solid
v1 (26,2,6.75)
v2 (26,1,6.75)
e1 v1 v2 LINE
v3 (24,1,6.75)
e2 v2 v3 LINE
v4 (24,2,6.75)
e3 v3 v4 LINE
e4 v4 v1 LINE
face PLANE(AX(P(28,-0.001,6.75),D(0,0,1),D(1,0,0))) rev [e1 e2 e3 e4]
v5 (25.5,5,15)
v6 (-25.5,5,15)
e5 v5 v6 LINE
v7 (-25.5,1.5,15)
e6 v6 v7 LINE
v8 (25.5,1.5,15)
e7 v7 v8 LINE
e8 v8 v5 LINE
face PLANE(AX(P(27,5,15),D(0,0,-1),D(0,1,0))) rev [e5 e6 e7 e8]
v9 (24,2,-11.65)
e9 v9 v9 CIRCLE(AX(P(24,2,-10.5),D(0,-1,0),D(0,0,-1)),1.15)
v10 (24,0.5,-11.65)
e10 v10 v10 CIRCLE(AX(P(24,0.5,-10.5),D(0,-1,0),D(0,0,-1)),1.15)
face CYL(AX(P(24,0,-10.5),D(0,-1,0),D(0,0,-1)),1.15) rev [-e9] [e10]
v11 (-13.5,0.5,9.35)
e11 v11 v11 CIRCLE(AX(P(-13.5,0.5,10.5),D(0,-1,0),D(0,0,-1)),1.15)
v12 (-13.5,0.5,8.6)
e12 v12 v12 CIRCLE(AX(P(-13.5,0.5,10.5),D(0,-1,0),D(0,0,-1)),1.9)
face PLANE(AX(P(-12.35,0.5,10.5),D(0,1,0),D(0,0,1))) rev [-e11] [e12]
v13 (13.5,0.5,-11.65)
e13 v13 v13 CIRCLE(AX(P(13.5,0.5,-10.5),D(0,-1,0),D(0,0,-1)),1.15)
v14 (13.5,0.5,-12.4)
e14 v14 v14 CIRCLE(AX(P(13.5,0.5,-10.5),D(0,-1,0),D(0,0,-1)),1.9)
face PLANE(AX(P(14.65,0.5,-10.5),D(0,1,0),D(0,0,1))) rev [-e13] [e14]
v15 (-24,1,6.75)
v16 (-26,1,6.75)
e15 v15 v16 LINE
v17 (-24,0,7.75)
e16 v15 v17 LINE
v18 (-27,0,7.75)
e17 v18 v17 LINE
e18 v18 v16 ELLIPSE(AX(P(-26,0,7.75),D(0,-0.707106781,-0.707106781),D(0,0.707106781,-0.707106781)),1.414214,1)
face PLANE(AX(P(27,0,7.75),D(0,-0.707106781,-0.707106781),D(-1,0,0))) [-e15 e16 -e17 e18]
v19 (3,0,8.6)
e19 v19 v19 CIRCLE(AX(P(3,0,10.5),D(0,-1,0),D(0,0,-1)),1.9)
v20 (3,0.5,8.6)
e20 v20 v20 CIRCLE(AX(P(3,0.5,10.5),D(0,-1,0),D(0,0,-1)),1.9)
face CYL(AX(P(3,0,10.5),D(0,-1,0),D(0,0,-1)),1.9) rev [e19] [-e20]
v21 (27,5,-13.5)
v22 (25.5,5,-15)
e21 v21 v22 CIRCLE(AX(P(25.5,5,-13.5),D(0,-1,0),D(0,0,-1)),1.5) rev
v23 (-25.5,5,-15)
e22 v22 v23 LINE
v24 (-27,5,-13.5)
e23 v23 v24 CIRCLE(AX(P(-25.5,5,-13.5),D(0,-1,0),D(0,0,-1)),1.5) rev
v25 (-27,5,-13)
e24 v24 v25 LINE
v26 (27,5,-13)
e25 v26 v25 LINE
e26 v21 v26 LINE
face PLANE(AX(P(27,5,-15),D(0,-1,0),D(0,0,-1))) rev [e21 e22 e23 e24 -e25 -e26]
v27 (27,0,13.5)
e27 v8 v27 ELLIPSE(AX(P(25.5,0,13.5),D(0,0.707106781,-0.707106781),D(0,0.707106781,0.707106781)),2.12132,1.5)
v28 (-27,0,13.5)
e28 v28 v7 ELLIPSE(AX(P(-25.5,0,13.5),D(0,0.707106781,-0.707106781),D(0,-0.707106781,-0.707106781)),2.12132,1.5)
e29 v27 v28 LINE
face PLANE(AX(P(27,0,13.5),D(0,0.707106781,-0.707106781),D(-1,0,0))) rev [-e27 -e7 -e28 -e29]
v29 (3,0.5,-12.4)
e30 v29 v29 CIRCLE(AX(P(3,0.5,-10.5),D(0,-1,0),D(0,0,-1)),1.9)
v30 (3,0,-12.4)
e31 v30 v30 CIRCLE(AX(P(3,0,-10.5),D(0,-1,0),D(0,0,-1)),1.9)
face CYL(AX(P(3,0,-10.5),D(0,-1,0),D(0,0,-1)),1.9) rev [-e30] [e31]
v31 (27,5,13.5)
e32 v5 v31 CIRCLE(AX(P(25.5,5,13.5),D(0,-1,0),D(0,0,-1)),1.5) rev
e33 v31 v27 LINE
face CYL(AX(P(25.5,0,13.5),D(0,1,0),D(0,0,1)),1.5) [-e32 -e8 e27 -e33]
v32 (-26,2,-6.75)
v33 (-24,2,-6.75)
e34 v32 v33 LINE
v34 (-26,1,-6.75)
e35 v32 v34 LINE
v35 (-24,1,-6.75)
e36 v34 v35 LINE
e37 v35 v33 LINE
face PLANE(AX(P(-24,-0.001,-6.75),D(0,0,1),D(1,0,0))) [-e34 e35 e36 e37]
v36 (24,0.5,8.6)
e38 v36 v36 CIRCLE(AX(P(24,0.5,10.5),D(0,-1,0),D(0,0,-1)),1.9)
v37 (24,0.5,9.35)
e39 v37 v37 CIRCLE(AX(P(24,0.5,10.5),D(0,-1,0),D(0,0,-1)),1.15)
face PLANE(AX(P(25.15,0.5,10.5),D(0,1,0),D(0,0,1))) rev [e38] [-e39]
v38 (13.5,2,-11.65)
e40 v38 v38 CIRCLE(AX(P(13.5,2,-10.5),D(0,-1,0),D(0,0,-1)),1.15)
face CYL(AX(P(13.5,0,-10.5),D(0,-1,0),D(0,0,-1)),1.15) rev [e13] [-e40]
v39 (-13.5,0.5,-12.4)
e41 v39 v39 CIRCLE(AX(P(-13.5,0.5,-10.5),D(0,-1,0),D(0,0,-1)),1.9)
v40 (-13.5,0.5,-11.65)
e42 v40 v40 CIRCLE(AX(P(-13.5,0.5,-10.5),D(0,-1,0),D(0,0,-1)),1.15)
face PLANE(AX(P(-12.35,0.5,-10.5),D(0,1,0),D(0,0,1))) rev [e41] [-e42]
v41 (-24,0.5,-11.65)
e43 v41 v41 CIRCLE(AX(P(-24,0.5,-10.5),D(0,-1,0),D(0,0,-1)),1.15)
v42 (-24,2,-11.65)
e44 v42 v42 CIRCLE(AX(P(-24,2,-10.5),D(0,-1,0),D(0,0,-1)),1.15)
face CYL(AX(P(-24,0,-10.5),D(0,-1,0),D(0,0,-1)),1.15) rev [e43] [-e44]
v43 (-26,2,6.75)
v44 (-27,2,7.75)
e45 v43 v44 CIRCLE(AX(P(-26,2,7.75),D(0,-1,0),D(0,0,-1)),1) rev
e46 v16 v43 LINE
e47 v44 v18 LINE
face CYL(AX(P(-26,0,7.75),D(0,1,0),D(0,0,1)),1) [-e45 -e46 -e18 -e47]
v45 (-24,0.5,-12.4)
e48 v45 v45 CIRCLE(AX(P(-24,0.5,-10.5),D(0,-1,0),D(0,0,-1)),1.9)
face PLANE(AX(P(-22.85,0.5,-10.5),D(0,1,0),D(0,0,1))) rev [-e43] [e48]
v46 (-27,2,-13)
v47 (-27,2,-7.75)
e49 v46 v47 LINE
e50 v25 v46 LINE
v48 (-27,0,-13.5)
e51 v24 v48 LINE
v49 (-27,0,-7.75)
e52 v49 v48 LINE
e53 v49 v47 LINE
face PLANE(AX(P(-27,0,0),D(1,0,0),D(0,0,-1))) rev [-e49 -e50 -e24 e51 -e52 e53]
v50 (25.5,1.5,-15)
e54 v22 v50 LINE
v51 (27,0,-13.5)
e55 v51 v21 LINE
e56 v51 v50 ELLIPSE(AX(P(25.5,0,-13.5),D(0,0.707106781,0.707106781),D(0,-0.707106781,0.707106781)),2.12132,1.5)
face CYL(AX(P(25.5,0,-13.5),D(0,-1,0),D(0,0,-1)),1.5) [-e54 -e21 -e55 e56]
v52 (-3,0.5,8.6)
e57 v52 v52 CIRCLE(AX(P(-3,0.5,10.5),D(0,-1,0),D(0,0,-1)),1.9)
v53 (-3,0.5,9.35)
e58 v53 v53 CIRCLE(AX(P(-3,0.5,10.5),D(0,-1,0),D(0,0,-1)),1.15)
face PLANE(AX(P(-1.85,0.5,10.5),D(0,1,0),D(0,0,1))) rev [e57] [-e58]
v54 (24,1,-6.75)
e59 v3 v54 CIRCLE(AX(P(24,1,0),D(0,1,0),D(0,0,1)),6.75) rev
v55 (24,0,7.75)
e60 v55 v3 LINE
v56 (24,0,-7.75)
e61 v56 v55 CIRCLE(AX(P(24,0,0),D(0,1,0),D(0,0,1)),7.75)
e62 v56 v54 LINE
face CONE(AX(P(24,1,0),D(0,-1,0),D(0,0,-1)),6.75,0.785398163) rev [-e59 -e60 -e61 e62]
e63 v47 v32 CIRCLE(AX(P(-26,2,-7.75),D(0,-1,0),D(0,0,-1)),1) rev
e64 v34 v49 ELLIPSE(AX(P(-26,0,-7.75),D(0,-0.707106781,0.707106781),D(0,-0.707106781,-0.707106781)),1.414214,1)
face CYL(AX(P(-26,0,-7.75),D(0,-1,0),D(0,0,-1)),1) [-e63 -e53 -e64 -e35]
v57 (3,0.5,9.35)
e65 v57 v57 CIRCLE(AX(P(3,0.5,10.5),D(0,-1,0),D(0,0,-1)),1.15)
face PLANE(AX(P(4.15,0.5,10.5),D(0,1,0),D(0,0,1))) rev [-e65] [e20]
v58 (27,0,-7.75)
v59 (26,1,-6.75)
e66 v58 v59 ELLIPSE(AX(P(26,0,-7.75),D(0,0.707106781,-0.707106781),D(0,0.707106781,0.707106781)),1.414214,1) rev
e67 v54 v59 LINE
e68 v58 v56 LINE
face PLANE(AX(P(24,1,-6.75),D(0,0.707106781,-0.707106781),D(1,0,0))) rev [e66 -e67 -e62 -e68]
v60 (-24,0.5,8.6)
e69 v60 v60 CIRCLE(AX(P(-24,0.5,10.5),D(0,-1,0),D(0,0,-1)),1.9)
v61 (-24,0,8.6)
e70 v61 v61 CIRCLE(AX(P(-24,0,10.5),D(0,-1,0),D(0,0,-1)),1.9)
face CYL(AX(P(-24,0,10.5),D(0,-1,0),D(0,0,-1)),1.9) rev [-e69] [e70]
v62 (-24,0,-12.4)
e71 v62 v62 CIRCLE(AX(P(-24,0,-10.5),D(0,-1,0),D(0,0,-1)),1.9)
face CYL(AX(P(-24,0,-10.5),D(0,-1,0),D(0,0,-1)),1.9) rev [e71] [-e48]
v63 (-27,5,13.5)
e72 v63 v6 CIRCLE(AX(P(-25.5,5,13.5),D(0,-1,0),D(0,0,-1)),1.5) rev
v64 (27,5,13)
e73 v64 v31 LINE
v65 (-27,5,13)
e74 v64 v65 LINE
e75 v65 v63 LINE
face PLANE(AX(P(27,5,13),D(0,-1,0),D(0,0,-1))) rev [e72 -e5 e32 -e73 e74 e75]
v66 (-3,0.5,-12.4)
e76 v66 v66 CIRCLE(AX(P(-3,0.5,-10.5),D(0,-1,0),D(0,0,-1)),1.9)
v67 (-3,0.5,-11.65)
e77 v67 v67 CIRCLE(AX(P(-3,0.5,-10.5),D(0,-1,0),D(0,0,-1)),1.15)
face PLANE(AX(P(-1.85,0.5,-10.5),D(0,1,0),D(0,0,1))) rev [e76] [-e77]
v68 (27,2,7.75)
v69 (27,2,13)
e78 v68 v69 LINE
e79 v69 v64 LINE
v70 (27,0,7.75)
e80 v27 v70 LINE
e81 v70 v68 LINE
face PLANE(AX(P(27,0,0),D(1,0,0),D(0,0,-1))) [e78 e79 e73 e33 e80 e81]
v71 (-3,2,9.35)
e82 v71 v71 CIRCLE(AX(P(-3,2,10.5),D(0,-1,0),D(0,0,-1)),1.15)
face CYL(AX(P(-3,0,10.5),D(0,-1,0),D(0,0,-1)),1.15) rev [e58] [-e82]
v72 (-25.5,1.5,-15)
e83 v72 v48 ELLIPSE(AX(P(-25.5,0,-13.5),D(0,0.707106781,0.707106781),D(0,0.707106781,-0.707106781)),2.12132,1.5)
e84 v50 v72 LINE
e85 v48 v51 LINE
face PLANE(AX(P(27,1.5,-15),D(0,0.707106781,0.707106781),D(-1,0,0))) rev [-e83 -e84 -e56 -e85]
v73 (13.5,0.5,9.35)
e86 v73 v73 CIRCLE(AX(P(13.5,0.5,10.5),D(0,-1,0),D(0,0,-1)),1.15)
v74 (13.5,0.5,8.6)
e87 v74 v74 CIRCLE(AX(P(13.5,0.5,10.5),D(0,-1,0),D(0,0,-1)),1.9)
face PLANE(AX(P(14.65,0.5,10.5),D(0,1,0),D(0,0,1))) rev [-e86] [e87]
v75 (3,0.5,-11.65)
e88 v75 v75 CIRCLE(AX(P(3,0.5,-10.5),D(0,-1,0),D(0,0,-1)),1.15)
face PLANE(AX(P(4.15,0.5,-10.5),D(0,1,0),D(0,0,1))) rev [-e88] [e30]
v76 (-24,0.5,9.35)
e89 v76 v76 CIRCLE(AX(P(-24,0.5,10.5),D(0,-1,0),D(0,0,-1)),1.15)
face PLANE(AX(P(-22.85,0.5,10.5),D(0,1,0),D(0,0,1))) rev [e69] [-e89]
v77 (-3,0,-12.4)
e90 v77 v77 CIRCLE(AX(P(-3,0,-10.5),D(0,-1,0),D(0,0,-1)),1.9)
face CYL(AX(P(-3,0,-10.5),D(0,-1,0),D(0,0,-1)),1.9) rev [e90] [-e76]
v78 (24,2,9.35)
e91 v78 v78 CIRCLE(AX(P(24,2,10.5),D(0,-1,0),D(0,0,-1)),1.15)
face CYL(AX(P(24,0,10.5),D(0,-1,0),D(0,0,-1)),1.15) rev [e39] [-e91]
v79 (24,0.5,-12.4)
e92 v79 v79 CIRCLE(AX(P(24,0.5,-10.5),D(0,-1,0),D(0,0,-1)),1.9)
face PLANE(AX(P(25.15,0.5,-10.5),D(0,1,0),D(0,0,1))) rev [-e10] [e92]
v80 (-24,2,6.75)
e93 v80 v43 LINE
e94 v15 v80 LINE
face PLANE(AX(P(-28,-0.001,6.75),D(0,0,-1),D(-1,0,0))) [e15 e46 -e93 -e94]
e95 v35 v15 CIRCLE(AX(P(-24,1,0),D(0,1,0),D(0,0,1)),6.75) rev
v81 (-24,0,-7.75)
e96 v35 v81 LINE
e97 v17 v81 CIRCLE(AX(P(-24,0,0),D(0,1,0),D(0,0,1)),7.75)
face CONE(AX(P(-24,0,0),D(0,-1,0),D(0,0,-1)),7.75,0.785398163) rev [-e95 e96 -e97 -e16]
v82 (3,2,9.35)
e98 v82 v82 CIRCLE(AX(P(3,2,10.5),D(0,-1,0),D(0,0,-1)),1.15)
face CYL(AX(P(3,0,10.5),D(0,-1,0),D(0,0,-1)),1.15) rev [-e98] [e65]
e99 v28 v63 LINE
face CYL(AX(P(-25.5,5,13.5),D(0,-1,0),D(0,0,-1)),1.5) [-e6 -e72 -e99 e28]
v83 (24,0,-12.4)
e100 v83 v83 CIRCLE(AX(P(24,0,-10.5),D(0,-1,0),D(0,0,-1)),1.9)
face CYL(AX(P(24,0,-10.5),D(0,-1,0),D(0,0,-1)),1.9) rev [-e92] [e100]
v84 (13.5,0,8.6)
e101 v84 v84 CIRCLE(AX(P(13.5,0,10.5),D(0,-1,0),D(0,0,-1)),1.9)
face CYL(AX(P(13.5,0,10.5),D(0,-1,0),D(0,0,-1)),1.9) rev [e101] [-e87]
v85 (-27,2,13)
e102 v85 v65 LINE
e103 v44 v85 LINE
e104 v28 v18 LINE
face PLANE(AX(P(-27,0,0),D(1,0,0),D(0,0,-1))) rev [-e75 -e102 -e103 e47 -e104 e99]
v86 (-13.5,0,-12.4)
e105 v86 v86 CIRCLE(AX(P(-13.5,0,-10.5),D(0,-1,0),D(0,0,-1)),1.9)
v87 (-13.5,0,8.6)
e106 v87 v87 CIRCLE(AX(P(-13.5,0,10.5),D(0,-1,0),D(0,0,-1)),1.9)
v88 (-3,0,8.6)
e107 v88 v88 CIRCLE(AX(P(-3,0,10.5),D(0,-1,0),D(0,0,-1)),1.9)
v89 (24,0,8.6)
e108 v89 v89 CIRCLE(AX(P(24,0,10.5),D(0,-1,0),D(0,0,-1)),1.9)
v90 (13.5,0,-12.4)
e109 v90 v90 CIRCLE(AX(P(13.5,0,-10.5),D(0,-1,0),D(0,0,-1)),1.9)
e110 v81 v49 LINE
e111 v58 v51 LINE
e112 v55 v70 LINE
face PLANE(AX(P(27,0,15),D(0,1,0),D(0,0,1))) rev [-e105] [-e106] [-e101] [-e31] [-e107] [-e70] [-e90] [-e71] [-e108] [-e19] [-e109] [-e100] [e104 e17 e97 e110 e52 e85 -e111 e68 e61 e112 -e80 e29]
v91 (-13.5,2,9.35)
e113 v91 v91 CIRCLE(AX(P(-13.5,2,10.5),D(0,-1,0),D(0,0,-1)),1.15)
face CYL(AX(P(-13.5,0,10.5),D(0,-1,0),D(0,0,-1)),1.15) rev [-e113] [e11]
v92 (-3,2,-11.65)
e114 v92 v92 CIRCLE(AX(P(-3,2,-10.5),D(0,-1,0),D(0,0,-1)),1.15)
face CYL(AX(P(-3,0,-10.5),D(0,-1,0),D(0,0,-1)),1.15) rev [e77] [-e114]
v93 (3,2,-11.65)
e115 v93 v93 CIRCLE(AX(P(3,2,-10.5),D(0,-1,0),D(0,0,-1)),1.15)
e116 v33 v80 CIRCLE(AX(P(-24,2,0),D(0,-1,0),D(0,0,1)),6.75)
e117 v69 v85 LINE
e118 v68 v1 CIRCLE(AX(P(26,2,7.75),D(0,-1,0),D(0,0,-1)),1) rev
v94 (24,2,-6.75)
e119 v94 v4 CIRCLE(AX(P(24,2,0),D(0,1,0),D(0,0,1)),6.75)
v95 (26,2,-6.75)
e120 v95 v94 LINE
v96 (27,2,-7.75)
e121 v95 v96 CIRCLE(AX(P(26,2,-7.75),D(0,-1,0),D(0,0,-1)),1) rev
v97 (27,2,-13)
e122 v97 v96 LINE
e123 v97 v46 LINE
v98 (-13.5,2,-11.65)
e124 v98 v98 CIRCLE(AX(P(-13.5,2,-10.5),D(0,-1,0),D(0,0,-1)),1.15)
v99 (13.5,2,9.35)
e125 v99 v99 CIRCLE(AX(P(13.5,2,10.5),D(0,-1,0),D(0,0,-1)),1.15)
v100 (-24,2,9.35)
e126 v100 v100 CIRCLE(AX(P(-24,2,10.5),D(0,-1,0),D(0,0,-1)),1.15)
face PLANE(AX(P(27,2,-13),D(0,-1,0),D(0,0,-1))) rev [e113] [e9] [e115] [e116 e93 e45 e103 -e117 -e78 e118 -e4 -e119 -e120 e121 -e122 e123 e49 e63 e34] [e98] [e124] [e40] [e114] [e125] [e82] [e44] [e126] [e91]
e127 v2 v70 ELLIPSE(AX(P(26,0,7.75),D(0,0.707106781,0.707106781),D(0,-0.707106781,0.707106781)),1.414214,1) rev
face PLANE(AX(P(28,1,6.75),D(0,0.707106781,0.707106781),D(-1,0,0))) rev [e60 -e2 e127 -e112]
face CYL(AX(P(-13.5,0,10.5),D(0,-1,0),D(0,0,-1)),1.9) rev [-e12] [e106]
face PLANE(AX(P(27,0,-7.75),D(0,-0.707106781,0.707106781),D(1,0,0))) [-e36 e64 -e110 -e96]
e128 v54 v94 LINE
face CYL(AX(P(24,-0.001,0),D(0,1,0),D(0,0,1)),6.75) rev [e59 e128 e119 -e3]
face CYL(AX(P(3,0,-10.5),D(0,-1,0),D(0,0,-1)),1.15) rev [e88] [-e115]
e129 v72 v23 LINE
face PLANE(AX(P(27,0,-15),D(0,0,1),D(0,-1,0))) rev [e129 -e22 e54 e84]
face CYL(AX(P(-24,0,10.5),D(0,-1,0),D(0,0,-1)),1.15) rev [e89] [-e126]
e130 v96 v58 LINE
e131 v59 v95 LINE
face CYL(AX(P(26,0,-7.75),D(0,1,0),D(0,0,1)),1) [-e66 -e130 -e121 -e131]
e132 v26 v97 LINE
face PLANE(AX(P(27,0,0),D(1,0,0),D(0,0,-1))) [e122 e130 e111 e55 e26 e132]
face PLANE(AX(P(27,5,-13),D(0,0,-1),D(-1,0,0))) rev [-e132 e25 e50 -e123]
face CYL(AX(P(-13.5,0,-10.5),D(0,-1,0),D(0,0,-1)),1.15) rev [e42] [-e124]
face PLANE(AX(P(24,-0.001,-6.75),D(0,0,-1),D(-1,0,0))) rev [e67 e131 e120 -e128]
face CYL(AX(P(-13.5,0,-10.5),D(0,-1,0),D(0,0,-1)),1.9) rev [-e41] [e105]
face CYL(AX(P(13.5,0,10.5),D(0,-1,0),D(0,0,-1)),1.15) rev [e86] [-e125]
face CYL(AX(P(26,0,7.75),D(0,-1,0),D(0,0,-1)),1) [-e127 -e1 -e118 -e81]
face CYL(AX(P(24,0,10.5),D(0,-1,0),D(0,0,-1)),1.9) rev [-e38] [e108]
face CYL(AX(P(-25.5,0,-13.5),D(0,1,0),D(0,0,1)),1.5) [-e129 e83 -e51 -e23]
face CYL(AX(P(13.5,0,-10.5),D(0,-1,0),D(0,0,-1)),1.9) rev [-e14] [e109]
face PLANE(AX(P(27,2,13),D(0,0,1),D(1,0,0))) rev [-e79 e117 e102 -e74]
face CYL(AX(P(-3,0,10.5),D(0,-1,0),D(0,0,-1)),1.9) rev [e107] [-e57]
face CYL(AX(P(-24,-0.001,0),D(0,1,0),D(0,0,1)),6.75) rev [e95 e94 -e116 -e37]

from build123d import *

# Parameters (mm, degrees)
EXTRUDE_1_DEPTH              = 27
CUT_EXTRUDE_1_REACH          = 33.032
HOLE_WIZARD_M2_1_D           = 2.3
HOLE_WIZARD_M2_1_CBORE_D     = 3.8
HOLE_WIZARD_M2_1_CBORE_DEPTH = 0.5
PATTERN_LINEAR_1_COUNT       = 3
PATTERN_LINEAR_1_PITCH       = 10.5
MIRROR_1_COPY_1_D            = 2.3
MIRROR_1_COPY_1_CBORE_D      = 3.8
MIRROR_1_COPY_1_CBORE_DEPTH  = 0.5
MIRROR_1_COPY_2_D            = 2.3
MIRROR_1_COPY_2_CBORE_D      = 3.8
MIRROR_1_COPY_2_CBORE_DEPTH  = 0.5
CHAMFER_1_SIZE               = 1
MIRROR_3_COPY_1_D            = 2.3
MIRROR_3_COPY_1_CBORE_D      = 3.8
MIRROR_3_COPY_1_CBORE_DEPTH  = 0.5
MIRROR_3_COPY_2_D            = 2.3
MIRROR_3_COPY_2_CBORE_D      = 3.8
MIRROR_3_COPY_2_CBORE_DEPTH  = 0.5
MIRROR_3_COPY_3_D            = 2.3
MIRROR_3_COPY_3_CBORE_D      = 3.8
MIRROR_3_COPY_3_CBORE_DEPTH  = 0.5
MIRROR_3_COPY_4_D            = 2.3
MIRROR_3_COPY_4_CBORE_D      = 3.8
MIRROR_3_COPY_4_CBORE_DEPTH  = 0.5
MIRROR_3_COPY_5_D            = 2.3
MIRROR_3_COPY_5_CBORE_D      = 3.8
MIRROR_3_COPY_5_CBORE_DEPTH  = 0.5
CHAMFER_1_OF_MIRROR_3_SIZE   = 1
FILLET_1_R                   = 1.5
FILLET_2_R                   = 1
CHAMFER_2_SIZE               = 1.5


with BuildPart() as part:
    # ｽｹｯﾁ1 → ﾎﾞｽ - 押し出し1 (new, symmetric)
    with BuildSketch(Plane(origin=(0, 0, 0), x_dir=(0, 0, -1), z_dir=(1, 0, 0))):
        Polygon((-15, 0), (15, 0), (15, 5), (13, 5), (13, 2), (-13, 2), (-13, 5), (-15, 5), align=None)
    extrude(amount=EXTRUDE_1_DEPTH, both=True)

    # ｽｹｯﾁ2 → ｶｯﾄ - 押し出し1 (cut, up to next)
    with BuildSketch(Plane(origin=(0, 2, 0), x_dir=(1, 0, 0), z_dir=(0, 1, 0)), mode=Mode.PRIVATE) as cut_extrude_1_sk1:
        with BuildLine():
            Line((24, 6.75), (28, 6.75))
            Line((28, 6.75), (28, -6.75))
            Line((28, -6.75), (24, -6.75))
            ThreePointArc((24, -6.75), (17.25, 0), (24, 6.75))
        make_face()
    cut_extrude_1_tool1 = extrude(cut_extrude_1_sk1.sketch, amount=-CUT_EXTRUDE_1_REACH, mode=Mode.PRIVATE) & part.part
    cut_extrude_1 = cut_extrude_1_tool1.solids().sort_by_distance((23.22727, 2, 0))[0]
    add(cut_extrude_1, mode=Mode.SUBTRACT)

    # M2 丸平ねじ用座ぐり穴1 (through all)
    with Locations(Plane(origin=(0, 0, 0), x_dir=(-1, 0, 0), z_dir=(0, -1, 0))):
        with Locations((-24, -10.5)):
            hole_wizard_m2_1 = CounterBoreHole(HOLE_WIZARD_M2_1_D / 2, HOLE_WIZARD_M2_1_CBORE_D / 2, HOLE_WIZARD_M2_1_CBORE_DEPTH)

    # 直線ﾊﾟﾀｰﾝ1: M2 丸平ねじ用座ぐり穴1 ×3
    with Locations(*[(-i * PATTERN_LINEAR_1_PITCH, 0, 0) for i in range(1, PATTERN_LINEAR_1_COUNT)]):
        add(hole_wizard_m2_1, mode=Mode.SUBTRACT)

    # ﾐﾗｰ1: M2 丸平ねじ用座ぐり穴1 across plane
    add(hole_wizard_m2_1.mirror(Plane.XY), mode=Mode.SUBTRACT)

    # ﾐﾗｰ1 copy 1 (through all)
    with Locations(Plane(origin=(-10.5, 0, 0), x_dir=(-1, 0, 0), z_dir=(0, -1, 0))):
        with Locations((-24, 10.5)):
            CounterBoreHole(MIRROR_1_COPY_1_D / 2, MIRROR_1_COPY_1_CBORE_D / 2, MIRROR_1_COPY_1_CBORE_DEPTH)

    # ﾐﾗｰ1 copy 2 (through all)
    with Locations(Plane(origin=(-21, 0, 0), x_dir=(-1, 0, 0), z_dir=(0, -1, 0))):
        with Locations((-24, 10.5)):
            CounterBoreHole(MIRROR_1_COPY_2_D / 2, MIRROR_1_COPY_2_CBORE_D / 2, MIRROR_1_COPY_2_CBORE_DEPTH)

    # 面取り1
    chamfer_1_edges = [part.edges().sort_by_distance(p)[0] for p in [
        (25.5, 0, 6.75),
        (17.25, 0, 0),
        (25.5, 0, -6.75),
    ]]
    chamfer(chamfer_1_edges, length=CHAMFER_1_SIZE)

    # ﾐﾗｰ3: ｶｯﾄ - 押し出し1, M2 丸平ねじ用座ぐり穴1 across plane
    add(cut_extrude_1.mirror(Plane(origin=(0, 0, 0), x_dir=(0, 0, 1), z_dir=(1, 0, 0))), mode=Mode.SUBTRACT)
    add(hole_wizard_m2_1.mirror(Plane(origin=(0, 0, 0), x_dir=(0, 0, 1), z_dir=(1, 0, 0))), mode=Mode.SUBTRACT)

    # ﾐﾗｰ3 copy 1 (through all)
    with Locations(Plane(origin=(10.5, 0, 0), x_dir=(1, 0, 0), z_dir=(0, -1, 0))):
        with Locations((-24, 10.5)):
            CounterBoreHole(MIRROR_3_COPY_1_D / 2, MIRROR_3_COPY_1_CBORE_D / 2, MIRROR_3_COPY_1_CBORE_DEPTH)

    # ﾐﾗｰ3 copy 2 (through all)
    with Locations(Plane(origin=(21, 0, 0), x_dir=(1, 0, 0), z_dir=(0, -1, 0))):
        with Locations((-24, 10.5)):
            CounterBoreHole(MIRROR_3_COPY_2_D / 2, MIRROR_3_COPY_2_CBORE_D / 2, MIRROR_3_COPY_2_CBORE_DEPTH)

    # ﾐﾗｰ3 copy 3 (through all)
    with Locations(Plane.XZ):
        with Locations((-24, -10.5)):
            CounterBoreHole(MIRROR_3_COPY_3_D / 2, MIRROR_3_COPY_3_CBORE_D / 2, MIRROR_3_COPY_3_CBORE_DEPTH)

    # ﾐﾗｰ3 copy 4 (through all)
    with Locations(Plane(origin=(10.5, 0, 0), x_dir=(1, 0, 0), z_dir=(0, -1, 0))):
        with Locations((-24, -10.5)):
            CounterBoreHole(MIRROR_3_COPY_4_D / 2, MIRROR_3_COPY_4_CBORE_D / 2, MIRROR_3_COPY_4_CBORE_DEPTH)

    # ﾐﾗｰ3 copy 5 (through all)
    with Locations(Plane(origin=(21, 0, 0), x_dir=(1, 0, 0), z_dir=(0, -1, 0))):
        with Locations((-24, -10.5)):
            CounterBoreHole(MIRROR_3_COPY_5_D / 2, MIRROR_3_COPY_5_CBORE_D / 2, MIRROR_3_COPY_5_CBORE_DEPTH)

    # 面取り1 of ﾐﾗｰ3
    chamfer_1_of_mirror_3_edges = [part.edges().sort_by_distance(p)[0] for p in [
        (-25.5, 0, 6.75),
        (-17.25, 0, 0),
        (-25.5, 0, -6.75),
    ]]
    chamfer(chamfer_1_of_mirror_3_edges, length=CHAMFER_1_OF_MIRROR_3_SIZE)

    # ﾌｨﾚｯﾄ1
    fillet_1_edges = [part.edges().sort_by_distance(p)[0] for p in [
        (27, 2.5, -15),
        (-27, 2.5, 15),
        (27, 2.5, 15),
        (-27, 2.5, -15),
    ]]
    fillet(fillet_1_edges, radius=FILLET_1_R)

    # ﾌｨﾚｯﾄ2
    fillet_2_edges = [part.edges().sort_by_distance(p)[0] for p in [
        (27, 1.5, -6.75),
        (27, 1.5, 6.75),
        (-27, 1.5, -6.75),
        (-27, 1.5, 6.75),
    ]]
    fillet(fillet_2_edges, radius=FILLET_2_R)

    # 面取り2
    # the kernel refuses this chamfer: 1.5 mm, written as the material it takes off along each edge
    with BuildSketch(Plane(origin=(-29.357524482, 0, -15), x_dir=(0, -0.027495876610586542, 0.9996219169112968), z_dir=(1, 0, 0)), Plane(origin=(29.357524482, 0, 15), x_dir=(0, -0.027495876610586178, -0.9996219169112968), z_dir=(-1, 0, 0))) as chamfer_2_piece_1:
        Polygon((CHAMFER_2_SIZE * 0.999621916911, -CHAMFER_2_SIZE * 0.0274958766106), (-CHAMFER_2_SIZE * 0.0274958766106, -CHAMFER_2_SIZE * 0.999621916911), (0, 0), align=None)
    extrude(amount=58.715048964, mode=Mode.SUBTRACT)


solid = part.part
